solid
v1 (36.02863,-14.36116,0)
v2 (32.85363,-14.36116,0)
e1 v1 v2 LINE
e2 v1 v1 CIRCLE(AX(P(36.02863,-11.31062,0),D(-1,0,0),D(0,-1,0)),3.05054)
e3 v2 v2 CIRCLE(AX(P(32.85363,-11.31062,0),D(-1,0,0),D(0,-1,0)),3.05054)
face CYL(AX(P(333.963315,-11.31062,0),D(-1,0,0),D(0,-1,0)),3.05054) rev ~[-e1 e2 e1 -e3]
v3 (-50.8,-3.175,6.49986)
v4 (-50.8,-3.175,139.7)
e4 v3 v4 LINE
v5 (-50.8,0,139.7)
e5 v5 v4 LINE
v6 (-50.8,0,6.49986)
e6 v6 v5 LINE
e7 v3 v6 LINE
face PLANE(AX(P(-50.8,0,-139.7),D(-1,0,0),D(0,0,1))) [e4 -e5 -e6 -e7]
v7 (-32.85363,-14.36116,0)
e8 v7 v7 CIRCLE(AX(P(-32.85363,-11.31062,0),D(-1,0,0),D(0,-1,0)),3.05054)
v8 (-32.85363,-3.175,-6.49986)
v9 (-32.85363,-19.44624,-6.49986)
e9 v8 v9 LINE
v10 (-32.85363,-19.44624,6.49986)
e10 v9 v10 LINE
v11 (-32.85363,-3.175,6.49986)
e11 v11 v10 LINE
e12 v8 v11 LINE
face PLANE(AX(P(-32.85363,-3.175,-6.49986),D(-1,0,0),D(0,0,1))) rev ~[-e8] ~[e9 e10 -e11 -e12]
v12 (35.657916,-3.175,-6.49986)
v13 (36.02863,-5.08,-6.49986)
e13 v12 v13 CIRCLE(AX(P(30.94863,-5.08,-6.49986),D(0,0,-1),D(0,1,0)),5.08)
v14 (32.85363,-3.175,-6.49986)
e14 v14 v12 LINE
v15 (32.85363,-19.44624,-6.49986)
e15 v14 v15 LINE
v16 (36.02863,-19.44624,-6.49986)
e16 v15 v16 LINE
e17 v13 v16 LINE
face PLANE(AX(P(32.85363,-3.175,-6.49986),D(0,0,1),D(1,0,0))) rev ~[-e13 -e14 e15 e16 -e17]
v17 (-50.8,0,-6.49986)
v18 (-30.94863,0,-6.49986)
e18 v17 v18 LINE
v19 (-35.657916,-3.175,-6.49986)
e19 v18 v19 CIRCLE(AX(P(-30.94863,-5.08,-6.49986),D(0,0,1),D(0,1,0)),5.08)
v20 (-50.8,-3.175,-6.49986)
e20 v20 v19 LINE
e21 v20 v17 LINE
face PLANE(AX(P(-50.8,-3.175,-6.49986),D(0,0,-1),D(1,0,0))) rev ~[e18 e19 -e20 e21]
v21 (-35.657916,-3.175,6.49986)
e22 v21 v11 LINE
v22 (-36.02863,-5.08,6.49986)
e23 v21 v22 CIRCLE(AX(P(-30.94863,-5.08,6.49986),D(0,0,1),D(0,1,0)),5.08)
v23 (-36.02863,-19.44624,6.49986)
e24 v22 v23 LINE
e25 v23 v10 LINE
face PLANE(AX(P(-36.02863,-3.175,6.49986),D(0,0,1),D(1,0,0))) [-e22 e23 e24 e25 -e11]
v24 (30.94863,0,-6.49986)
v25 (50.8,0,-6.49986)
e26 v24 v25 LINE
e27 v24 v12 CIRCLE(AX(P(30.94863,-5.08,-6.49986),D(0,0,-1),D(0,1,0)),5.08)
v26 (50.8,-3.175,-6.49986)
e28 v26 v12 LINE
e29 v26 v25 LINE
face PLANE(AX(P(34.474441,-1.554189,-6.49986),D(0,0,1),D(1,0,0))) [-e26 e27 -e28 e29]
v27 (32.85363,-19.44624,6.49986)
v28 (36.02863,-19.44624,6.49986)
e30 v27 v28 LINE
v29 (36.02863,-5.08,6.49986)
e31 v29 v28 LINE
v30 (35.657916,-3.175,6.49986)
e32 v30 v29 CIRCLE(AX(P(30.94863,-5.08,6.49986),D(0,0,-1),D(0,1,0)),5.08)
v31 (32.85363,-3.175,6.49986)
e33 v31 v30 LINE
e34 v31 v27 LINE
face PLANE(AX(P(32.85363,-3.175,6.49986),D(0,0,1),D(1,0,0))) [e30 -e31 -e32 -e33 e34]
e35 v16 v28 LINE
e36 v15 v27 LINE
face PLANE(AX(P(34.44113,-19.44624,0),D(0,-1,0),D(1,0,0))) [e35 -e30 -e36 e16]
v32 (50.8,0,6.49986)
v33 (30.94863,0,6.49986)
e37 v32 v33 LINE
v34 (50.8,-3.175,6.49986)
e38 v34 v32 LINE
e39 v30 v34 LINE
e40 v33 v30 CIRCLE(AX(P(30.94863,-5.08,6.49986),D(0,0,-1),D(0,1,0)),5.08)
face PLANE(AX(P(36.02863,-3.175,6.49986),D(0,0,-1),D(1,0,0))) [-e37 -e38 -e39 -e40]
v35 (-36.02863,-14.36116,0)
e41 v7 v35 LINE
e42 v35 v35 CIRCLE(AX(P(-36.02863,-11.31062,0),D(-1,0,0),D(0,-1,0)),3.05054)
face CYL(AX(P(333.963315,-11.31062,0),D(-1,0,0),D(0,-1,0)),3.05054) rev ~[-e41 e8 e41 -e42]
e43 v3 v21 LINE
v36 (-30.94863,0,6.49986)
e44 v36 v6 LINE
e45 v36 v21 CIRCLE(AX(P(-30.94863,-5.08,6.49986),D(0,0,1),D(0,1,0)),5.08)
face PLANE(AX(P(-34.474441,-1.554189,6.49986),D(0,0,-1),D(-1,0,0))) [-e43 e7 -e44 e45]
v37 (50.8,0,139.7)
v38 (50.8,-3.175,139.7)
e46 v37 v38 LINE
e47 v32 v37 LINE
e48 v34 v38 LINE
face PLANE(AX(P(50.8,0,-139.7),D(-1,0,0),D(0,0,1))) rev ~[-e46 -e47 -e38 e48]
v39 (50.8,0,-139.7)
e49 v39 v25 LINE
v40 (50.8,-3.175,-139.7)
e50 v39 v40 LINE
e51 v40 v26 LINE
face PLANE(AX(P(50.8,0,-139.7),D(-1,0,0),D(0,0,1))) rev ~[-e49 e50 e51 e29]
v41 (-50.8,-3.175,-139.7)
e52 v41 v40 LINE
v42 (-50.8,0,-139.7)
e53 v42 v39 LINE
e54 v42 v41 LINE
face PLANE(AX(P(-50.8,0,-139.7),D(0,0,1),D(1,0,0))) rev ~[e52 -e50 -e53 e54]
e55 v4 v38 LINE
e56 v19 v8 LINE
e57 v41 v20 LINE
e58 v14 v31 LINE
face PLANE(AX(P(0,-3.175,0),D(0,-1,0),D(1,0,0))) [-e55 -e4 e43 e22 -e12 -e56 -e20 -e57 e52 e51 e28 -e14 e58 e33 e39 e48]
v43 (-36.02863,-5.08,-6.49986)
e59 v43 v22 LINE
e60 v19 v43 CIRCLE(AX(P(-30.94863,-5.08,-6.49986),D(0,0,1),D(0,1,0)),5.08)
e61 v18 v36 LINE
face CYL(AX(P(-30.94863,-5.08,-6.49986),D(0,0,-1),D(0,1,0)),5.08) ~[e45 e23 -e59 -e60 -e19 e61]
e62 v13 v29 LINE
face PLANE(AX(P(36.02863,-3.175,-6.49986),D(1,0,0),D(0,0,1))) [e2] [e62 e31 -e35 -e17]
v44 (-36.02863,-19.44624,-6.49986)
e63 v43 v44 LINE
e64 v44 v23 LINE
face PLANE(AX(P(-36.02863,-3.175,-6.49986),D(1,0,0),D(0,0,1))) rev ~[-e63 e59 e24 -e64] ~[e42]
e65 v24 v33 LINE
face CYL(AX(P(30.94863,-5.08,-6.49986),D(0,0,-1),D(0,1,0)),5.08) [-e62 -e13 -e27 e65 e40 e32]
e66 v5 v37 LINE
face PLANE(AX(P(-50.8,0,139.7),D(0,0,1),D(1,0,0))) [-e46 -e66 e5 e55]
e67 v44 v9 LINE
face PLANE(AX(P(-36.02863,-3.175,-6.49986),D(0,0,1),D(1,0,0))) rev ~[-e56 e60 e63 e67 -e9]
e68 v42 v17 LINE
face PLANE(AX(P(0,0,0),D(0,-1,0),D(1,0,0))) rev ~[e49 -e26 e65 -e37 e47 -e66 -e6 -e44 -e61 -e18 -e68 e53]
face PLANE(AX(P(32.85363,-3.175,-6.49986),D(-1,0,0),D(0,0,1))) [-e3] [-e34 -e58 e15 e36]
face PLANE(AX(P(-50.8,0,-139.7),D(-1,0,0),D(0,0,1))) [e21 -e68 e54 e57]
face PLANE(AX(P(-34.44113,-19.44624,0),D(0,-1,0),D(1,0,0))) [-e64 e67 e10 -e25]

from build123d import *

# Parameters (mm, degrees)
F0_W        = 101.6
F0_H        = 279.4
F1_DEPTH    = 3.175
F2_W        = 3.175
F2_H        = 12.99972
F3_DEPTH    = 16.27124
F2_W_2      = 14.77137
F4_DEPTH    = 25.4
F5_T1_DEPTH = 12.99972
F7_D        = 6.10108


# Not quite as in the source:
# - a fillet or chamfer that OpenCascade refuses, or shapes differently, is made with other operations: its cross-section is extruded or revolved along the edge and cut away or added


with BuildPart() as f1:
    # F0 (on Front) → F1 (new body)
    with BuildSketch(Plane.XZ):
        Rectangle(F0_W, F0_H)
    extrude(amount=F1_DEPTH)

    # F2 (on face) → F3 (join)
    with BuildSketch(Plane.XZ.offset(3.175)):
        with Locations((34.44113, 0)):
            Rectangle(F2_W, F2_H)
        with Locations((-34.44113, 0)):
            Rectangle(F2_W, F2_H)
    extrude(amount=F3_DEPTH)

    # F2 (on face) → F4 (cut)
    with BuildSketch(Plane.XZ.offset(3.175)):
        with Locations((43.414315, 0)):
            Rectangle(F2_W_2, F2_H)
        with Locations((-43.414315, 0)):
            Rectangle(F2_W_2, F2_H)
    extrude(amount=-F4_DEPTH, mode=Mode.SUBTRACT)

    # F5: fillet of radius 5.08 on 2 edges, made by hand

    # F5_s2 → F5_t1 (cut)
    with BuildSketch(Plane.XY.offset(-6.49986)):
        with BuildLine():
            ThreePointArc((30.94863, 0), (34.5407324484, -1.4878975516), (36.02863, -5.08))
            Line((36.02863, -5.08), (36.02863, 0))
            Line((36.02863, 0), (30.94863, 0))
        make_face()
        with BuildLine():
            ThreePointArc((-30.94863, 0), (-34.5407324484, -1.4878975516), (-36.02863, -5.08))
            Line((-36.02863, -5.08), (-36.02863, 0))
            Line((-36.02863, 0), (-30.94863, 0))
        make_face()
    extrude(amount=F5_T1_DEPTH, mode=Mode.SUBTRACT)

    # F7 (through all)
    with Locations(Plane.YZ.offset(36.02863)):
        with Locations((-11.31062, 0)):
            Hole(F7_D / 2)


solid = f1.part
